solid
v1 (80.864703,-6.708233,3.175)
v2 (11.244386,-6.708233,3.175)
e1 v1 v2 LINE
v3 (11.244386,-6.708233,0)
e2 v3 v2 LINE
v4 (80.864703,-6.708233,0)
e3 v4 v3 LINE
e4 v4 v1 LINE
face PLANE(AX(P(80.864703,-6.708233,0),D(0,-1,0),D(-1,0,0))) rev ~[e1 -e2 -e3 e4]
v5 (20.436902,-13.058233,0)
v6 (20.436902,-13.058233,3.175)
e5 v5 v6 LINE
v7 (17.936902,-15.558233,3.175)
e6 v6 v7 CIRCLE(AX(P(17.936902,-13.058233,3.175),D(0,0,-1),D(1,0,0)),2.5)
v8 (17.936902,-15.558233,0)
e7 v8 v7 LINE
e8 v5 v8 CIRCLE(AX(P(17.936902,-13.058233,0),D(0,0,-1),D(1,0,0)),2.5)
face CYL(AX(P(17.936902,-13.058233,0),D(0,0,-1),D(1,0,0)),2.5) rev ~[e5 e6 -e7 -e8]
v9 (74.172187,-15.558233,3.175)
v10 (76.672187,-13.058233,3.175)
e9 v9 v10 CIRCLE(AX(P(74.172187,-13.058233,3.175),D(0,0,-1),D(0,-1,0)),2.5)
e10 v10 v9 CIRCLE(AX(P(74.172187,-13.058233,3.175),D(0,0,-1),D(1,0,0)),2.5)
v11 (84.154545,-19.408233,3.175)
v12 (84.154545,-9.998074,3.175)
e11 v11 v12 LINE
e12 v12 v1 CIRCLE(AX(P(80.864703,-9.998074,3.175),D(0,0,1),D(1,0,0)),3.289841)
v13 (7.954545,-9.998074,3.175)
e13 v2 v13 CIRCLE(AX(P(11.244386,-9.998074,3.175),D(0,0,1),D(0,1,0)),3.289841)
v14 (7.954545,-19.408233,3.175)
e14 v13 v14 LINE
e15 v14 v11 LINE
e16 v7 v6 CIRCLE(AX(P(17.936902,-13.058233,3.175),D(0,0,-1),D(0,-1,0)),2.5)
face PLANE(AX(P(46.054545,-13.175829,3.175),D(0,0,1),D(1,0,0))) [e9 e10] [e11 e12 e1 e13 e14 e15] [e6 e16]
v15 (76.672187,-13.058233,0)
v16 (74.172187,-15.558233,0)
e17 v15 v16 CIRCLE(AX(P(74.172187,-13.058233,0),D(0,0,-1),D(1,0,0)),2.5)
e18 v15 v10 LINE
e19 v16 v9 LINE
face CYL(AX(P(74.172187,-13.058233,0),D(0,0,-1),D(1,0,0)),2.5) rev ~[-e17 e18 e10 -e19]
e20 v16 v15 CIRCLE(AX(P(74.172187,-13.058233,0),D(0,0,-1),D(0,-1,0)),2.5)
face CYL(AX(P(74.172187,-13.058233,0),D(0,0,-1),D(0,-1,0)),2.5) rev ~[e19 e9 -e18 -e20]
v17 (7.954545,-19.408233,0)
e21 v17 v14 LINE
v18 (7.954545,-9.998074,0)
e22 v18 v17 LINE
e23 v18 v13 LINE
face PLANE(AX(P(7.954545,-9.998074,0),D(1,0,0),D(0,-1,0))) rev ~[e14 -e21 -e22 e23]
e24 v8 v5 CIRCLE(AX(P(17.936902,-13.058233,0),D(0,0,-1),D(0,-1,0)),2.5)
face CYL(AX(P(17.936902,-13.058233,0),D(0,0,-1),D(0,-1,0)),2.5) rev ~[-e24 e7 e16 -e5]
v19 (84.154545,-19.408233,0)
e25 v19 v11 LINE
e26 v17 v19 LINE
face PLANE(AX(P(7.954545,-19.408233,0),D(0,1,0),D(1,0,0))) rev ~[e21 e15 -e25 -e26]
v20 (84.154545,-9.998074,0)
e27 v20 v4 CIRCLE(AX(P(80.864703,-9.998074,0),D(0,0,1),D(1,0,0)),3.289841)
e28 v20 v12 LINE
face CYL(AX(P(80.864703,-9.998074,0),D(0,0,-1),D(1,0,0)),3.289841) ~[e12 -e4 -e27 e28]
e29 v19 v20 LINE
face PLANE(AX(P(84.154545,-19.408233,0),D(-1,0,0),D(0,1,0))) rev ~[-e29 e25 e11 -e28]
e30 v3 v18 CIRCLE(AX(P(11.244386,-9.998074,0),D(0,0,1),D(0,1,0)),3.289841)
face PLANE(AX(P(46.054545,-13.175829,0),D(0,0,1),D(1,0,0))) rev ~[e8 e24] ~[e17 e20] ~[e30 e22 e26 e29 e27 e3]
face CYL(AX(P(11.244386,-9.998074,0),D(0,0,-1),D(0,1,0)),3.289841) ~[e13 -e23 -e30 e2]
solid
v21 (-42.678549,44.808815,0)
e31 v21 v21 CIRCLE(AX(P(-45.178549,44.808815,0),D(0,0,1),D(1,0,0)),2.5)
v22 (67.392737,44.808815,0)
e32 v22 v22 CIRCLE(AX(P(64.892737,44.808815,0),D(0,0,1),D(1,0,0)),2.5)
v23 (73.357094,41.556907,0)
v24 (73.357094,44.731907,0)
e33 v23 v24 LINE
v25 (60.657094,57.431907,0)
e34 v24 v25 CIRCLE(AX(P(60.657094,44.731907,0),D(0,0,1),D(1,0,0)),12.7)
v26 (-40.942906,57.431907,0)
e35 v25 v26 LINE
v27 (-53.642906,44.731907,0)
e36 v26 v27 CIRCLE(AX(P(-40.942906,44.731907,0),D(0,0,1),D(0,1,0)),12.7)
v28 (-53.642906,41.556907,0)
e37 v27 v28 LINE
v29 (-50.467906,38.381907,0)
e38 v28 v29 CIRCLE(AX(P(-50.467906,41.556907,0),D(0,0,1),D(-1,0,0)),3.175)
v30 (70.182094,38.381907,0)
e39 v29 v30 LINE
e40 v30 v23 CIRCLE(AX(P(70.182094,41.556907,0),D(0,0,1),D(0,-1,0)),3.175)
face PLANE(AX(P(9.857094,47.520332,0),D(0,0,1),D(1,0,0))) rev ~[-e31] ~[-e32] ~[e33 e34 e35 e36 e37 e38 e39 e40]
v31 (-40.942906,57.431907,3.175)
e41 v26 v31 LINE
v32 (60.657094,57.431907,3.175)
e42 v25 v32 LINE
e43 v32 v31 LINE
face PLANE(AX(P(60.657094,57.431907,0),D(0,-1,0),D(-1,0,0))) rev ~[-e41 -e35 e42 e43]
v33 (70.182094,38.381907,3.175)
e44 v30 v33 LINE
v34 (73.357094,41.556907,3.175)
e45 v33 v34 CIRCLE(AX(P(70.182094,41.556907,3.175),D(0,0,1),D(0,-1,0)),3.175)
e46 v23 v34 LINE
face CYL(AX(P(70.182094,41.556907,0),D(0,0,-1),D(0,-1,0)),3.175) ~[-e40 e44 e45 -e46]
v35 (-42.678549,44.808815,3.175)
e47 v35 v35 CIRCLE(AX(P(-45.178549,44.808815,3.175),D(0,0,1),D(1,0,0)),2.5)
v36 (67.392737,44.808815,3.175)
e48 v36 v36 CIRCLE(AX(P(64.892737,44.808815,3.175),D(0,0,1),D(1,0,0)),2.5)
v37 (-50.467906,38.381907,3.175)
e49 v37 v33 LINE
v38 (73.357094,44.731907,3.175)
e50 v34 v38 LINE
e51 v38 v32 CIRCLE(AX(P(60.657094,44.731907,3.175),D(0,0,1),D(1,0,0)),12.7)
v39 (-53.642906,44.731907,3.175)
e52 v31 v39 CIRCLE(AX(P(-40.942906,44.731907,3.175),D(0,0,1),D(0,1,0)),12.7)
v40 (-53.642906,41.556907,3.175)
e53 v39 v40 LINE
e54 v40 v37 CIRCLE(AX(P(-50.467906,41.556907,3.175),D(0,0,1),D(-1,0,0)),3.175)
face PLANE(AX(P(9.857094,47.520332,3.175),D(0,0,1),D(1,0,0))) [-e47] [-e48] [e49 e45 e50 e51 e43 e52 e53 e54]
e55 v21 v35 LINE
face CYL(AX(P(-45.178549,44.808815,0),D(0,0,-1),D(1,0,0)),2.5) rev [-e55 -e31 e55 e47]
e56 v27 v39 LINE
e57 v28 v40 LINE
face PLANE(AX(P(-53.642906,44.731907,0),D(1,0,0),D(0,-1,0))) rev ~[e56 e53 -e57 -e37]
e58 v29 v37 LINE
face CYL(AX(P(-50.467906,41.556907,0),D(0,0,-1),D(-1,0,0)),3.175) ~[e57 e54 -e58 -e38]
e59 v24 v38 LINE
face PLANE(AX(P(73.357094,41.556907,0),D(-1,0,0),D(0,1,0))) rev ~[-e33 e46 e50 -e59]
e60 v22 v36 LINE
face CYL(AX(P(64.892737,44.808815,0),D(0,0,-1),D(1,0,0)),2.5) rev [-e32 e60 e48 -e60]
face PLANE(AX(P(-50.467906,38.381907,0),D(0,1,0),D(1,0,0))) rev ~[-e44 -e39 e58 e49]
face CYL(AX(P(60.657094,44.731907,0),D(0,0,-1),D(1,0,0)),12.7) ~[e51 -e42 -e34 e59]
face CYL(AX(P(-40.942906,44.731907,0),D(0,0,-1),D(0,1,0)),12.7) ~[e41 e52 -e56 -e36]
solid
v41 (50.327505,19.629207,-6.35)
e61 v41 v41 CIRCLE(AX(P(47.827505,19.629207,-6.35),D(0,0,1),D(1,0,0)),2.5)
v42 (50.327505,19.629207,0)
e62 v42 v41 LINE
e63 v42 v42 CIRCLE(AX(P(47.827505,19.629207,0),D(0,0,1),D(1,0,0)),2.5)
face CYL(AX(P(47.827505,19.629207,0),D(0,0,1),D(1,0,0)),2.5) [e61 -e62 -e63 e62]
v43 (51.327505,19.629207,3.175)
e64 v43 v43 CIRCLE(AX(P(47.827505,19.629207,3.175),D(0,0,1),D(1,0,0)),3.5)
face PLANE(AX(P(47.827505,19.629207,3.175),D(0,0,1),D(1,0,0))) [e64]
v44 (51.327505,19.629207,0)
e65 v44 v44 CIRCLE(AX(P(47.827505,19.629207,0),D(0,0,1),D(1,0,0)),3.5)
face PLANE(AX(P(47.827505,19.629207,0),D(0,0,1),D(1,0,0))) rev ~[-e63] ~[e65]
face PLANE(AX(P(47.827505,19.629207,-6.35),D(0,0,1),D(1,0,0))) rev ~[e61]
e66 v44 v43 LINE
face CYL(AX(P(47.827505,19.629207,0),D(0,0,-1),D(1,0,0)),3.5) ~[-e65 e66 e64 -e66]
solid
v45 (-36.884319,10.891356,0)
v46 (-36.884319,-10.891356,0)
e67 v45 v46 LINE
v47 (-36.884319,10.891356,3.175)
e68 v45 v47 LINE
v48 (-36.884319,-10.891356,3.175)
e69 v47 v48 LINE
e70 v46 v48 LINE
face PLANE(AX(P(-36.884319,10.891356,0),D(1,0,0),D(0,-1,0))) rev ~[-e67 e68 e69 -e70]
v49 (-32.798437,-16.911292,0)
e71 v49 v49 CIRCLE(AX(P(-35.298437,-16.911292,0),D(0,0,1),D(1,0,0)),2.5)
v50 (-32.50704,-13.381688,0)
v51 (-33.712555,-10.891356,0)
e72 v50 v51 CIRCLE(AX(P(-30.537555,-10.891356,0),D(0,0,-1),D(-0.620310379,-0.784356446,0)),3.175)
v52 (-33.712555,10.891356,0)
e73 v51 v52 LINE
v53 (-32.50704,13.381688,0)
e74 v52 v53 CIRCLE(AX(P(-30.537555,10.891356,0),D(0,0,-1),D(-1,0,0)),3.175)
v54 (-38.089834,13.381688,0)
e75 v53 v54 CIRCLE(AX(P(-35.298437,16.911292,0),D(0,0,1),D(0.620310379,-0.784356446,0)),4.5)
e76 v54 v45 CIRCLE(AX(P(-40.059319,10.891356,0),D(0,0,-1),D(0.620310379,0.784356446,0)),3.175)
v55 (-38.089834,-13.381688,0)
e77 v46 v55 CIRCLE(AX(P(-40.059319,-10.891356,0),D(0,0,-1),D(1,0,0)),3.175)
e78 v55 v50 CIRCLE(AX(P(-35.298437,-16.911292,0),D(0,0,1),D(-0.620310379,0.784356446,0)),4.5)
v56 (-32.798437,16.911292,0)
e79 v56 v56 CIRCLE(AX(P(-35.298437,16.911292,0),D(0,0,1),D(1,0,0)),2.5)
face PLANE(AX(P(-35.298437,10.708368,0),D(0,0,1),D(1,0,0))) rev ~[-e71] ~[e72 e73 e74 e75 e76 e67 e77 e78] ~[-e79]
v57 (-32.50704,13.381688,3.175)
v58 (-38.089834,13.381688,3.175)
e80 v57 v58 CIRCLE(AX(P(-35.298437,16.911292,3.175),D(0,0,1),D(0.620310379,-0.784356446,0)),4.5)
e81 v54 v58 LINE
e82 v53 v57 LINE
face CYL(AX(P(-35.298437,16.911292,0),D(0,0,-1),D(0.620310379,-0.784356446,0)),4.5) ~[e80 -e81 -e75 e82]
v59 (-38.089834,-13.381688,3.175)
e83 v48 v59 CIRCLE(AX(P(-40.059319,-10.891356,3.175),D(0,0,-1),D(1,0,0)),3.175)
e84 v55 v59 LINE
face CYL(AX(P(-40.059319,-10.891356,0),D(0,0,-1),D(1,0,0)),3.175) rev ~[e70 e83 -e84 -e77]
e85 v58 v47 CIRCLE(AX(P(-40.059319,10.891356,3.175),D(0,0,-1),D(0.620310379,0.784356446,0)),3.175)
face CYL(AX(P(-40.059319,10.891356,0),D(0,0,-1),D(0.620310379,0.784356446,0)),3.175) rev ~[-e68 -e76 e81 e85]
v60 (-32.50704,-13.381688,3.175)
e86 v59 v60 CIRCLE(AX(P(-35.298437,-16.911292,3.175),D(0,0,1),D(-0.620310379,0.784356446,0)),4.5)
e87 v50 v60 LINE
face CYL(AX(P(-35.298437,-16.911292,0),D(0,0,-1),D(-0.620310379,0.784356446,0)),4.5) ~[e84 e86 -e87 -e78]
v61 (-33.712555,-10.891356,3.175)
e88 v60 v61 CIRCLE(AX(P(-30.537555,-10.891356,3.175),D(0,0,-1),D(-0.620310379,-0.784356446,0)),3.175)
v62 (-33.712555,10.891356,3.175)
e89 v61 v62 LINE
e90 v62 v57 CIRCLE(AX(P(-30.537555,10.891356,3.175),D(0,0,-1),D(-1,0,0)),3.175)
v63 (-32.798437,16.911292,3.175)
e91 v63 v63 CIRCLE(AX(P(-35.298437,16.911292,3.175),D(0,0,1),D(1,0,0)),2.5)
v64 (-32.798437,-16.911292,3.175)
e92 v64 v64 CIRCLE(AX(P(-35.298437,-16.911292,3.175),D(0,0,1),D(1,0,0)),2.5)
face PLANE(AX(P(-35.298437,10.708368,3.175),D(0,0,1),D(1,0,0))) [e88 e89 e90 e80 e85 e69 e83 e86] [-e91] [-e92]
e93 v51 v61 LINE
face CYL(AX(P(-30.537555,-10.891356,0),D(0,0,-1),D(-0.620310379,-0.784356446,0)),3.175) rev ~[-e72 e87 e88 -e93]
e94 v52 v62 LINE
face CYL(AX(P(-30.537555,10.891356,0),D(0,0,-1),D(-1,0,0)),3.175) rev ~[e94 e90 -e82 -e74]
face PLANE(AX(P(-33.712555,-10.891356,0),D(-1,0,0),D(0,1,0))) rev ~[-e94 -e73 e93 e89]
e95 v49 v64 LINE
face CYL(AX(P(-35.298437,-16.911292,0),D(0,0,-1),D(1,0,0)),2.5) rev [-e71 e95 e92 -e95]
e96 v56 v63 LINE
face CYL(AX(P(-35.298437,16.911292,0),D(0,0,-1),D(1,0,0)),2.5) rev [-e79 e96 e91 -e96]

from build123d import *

# Parameters (mm, degrees)
F0_R     = 2.5
F1_DEPTH = 3.175
F2_R     = 2.5
F3_DEPTH = 3.175
F4_R     = 2.5
F5_DEPTH = 6.35
F4_R_2   = 3.5
F6_DEPTH = 3.175
F8_DEPTH = 3.175


# Not quite as in the source:
# - a length typed as a fraction of an inch, garbled in the dataset ("3 / 203.2 mm" for 3/8 in), is restored


with BuildPart() as f1:
    # F0 (on Top) → F1 (new body)
    with BuildSketch(Plane.XY):
        with BuildLine():
            ThreePointArc((-33.712554723, 10.891355979), (-33.3953284467, 12.2747410823), (-32.5070401756, 13.3816876943))
            ThreePointArc((-32.5070401756, 13.3816876943), (-35.2984368801, 21.4112917002), (-38.0898335846, 13.3816876943))
            ThreePointArc((-38.0898335846, 13.3816876943), (-37.2015453135, 12.2747410823), (-36.8843190372, 10.891355979))
            Line((-36.8843190372, 10.891355979), (-36.8843190372, 0))
            Line((-36.8843190372, 0), (-33.712554723, 0))
            Line((-33.712554723, 0), (-33.712554723, 10.891355979))
        make_face()
        with Locations((-35.2984368801, 16.9112917002)):
            Circle(F0_R, mode=Mode.SUBTRACT)
        with BuildLine():
            Line((-33.712554723, -10.891355979), (-33.712554723, 0))
            Line((-33.712554723, 0), (-36.8843190372, 0))
            Line((-36.8843190372, 0), (-36.8843190372, -10.891355979))
            ThreePointArc((-36.8843190372, -10.891355979), (-37.2015453135, -12.2747410823), (-38.0898335846, -13.3816876943))
            ThreePointArc((-38.0898335846, -13.3816876943), (-35.2984368801, -21.4112917002), (-32.5070401756, -13.3816876943))
            ThreePointArc((-32.5070401756, -13.3816876943), (-33.3953284467, -12.2747410823), (-33.712554723, -10.891355979))
        make_face()
        with Locations((-35.2984368801, -16.9112917002)):
            Circle(F0_R, mode=Mode.SUBTRACT)
    extrude(amount=F1_DEPTH)


with BuildPart() as f3:
    # F2 (on Top) → F3 (new body)
    with BuildSketch(Plane.XY):
        with BuildLine():
            ThreePointArc((-53.6429062486, 41.5569074162), (-52.7129702788, 39.3118433859), (-50.4679062486, 38.3819074162))
            Line((-50.4679062486, 38.3819074162), (9.8570937514, 38.3819074162))
            Line((9.8570937514, 38.3819074162), (70.1820937514, 38.3819074162))
            ThreePointArc((70.1820937514, 38.3819074162), (72.4271577817, 39.3118433859), (73.3570937514, 41.5569074162))
            Line((73.3570937514, 41.5569074162), (73.3570937514, 44.7319074162))
            ThreePointArc((73.3570937514, 44.7319074162), (69.6373498725, 53.7121635373), (60.6570937514, 57.4319074162))
            Line((60.6570937514, 57.4319074162), (9.8570937514, 57.4319074162))
            Line((9.8570937514, 57.4319074162), (-40.9429062486, 57.4319074162))
            ThreePointArc((-40.9429062486, 57.4319074162), (-49.9231623696, 53.7121635373), (-53.6429062486, 44.7319074162))
            Line((-53.6429062486, 44.7319074162), (-53.6429062486, 41.5569074162))
        make_face()
        with Locations((-45.1785493704, 44.8088147985)):
            Circle(F2_R, mode=Mode.SUBTRACT)
        with Locations((64.8927368733, 44.8088147985)):
            Circle(F2_R, mode=Mode.SUBTRACT)
    extrude(amount=F3_DEPTH)


with BuildPart() as f5:
    # F4 (on Top) → F5 (new body)
    with BuildSketch(Plane.XY):
        with Locations((47.8275045753, 19.6292065084)):
            Circle(F4_R)
    extrude(amount=-F5_DEPTH)

    # F4 (on Top) → F6 (join)
    with BuildSketch(Plane.XY):
        with Locations((47.8275045753, 19.6292065084)):
            Circle(F4_R_2)
        with Locations((47.8275045753, 19.6292065084)):
            Circle(F4_R, mode=Mode.SUBTRACT)
        with Locations((47.8275045753, 19.6292065084)):
            Circle(F4_R)
    extrude(amount=F6_DEPTH)


with BuildPart() as f8:
    # F7 (on Top) → F8 (new body)
    with BuildSketch(Plane.XY):
        with BuildLine():
            Line((46.0545447382, -6.708232842), (11.2443861502, -6.708232842))
            ThreePointArc((11.2443861502, -6.708232842), (8.9181169788, -7.6718050825), (7.9545447382, -9.9980742539))
            Line((7.9545447382, -9.9980742539), (7.9545447382, -19.408232842))
            Line((7.9545447382, -19.408232842), (17.9369021207, -19.408232842))
            Line((17.9369021207, -19.408232842), (46.0545447382, -19.408232842))
            Line((46.0545447382, -19.408232842), (74.1721873558, -19.408232842))
            Line((74.1721873558, -19.408232842), (84.1545447382, -19.408232842))
            Line((84.1545447382, -19.408232842), (84.1545447382, -9.9980742539))
            ThreePointArc((84.1545447382, -9.9980742539), (83.1909724977, -7.6718050825), (80.8647033263, -6.708232842))
            Line((80.8647033263, -6.708232842), (46.0545447382, -6.708232842))
        make_face()
        with BuildLine():
            ThreePointArc((20.4369021207, -13.058232842), (19.7046690737, -14.825999795), (17.9369021207, -15.558232842))
            ThreePointArc((17.9369021207, -15.558232842), (16.1691351677, -11.290465889), (20.4369021207, -13.058232842))
        make_face(mode=Mode.SUBTRACT)
        with BuildLine():
            ThreePointArc((76.6721873558, -13.058232842), (75.9399543087, -14.825999795), (74.1721873558, -15.558232842))
            ThreePointArc((74.1721873558, -15.558232842), (72.4044204028, -11.290465889), (76.6721873558, -13.058232842))
        make_face(mode=Mode.SUBTRACT)
    extrude(amount=F8_DEPTH)


solid = Compound([f1.part, f3.part, f5.part, f8.part])
